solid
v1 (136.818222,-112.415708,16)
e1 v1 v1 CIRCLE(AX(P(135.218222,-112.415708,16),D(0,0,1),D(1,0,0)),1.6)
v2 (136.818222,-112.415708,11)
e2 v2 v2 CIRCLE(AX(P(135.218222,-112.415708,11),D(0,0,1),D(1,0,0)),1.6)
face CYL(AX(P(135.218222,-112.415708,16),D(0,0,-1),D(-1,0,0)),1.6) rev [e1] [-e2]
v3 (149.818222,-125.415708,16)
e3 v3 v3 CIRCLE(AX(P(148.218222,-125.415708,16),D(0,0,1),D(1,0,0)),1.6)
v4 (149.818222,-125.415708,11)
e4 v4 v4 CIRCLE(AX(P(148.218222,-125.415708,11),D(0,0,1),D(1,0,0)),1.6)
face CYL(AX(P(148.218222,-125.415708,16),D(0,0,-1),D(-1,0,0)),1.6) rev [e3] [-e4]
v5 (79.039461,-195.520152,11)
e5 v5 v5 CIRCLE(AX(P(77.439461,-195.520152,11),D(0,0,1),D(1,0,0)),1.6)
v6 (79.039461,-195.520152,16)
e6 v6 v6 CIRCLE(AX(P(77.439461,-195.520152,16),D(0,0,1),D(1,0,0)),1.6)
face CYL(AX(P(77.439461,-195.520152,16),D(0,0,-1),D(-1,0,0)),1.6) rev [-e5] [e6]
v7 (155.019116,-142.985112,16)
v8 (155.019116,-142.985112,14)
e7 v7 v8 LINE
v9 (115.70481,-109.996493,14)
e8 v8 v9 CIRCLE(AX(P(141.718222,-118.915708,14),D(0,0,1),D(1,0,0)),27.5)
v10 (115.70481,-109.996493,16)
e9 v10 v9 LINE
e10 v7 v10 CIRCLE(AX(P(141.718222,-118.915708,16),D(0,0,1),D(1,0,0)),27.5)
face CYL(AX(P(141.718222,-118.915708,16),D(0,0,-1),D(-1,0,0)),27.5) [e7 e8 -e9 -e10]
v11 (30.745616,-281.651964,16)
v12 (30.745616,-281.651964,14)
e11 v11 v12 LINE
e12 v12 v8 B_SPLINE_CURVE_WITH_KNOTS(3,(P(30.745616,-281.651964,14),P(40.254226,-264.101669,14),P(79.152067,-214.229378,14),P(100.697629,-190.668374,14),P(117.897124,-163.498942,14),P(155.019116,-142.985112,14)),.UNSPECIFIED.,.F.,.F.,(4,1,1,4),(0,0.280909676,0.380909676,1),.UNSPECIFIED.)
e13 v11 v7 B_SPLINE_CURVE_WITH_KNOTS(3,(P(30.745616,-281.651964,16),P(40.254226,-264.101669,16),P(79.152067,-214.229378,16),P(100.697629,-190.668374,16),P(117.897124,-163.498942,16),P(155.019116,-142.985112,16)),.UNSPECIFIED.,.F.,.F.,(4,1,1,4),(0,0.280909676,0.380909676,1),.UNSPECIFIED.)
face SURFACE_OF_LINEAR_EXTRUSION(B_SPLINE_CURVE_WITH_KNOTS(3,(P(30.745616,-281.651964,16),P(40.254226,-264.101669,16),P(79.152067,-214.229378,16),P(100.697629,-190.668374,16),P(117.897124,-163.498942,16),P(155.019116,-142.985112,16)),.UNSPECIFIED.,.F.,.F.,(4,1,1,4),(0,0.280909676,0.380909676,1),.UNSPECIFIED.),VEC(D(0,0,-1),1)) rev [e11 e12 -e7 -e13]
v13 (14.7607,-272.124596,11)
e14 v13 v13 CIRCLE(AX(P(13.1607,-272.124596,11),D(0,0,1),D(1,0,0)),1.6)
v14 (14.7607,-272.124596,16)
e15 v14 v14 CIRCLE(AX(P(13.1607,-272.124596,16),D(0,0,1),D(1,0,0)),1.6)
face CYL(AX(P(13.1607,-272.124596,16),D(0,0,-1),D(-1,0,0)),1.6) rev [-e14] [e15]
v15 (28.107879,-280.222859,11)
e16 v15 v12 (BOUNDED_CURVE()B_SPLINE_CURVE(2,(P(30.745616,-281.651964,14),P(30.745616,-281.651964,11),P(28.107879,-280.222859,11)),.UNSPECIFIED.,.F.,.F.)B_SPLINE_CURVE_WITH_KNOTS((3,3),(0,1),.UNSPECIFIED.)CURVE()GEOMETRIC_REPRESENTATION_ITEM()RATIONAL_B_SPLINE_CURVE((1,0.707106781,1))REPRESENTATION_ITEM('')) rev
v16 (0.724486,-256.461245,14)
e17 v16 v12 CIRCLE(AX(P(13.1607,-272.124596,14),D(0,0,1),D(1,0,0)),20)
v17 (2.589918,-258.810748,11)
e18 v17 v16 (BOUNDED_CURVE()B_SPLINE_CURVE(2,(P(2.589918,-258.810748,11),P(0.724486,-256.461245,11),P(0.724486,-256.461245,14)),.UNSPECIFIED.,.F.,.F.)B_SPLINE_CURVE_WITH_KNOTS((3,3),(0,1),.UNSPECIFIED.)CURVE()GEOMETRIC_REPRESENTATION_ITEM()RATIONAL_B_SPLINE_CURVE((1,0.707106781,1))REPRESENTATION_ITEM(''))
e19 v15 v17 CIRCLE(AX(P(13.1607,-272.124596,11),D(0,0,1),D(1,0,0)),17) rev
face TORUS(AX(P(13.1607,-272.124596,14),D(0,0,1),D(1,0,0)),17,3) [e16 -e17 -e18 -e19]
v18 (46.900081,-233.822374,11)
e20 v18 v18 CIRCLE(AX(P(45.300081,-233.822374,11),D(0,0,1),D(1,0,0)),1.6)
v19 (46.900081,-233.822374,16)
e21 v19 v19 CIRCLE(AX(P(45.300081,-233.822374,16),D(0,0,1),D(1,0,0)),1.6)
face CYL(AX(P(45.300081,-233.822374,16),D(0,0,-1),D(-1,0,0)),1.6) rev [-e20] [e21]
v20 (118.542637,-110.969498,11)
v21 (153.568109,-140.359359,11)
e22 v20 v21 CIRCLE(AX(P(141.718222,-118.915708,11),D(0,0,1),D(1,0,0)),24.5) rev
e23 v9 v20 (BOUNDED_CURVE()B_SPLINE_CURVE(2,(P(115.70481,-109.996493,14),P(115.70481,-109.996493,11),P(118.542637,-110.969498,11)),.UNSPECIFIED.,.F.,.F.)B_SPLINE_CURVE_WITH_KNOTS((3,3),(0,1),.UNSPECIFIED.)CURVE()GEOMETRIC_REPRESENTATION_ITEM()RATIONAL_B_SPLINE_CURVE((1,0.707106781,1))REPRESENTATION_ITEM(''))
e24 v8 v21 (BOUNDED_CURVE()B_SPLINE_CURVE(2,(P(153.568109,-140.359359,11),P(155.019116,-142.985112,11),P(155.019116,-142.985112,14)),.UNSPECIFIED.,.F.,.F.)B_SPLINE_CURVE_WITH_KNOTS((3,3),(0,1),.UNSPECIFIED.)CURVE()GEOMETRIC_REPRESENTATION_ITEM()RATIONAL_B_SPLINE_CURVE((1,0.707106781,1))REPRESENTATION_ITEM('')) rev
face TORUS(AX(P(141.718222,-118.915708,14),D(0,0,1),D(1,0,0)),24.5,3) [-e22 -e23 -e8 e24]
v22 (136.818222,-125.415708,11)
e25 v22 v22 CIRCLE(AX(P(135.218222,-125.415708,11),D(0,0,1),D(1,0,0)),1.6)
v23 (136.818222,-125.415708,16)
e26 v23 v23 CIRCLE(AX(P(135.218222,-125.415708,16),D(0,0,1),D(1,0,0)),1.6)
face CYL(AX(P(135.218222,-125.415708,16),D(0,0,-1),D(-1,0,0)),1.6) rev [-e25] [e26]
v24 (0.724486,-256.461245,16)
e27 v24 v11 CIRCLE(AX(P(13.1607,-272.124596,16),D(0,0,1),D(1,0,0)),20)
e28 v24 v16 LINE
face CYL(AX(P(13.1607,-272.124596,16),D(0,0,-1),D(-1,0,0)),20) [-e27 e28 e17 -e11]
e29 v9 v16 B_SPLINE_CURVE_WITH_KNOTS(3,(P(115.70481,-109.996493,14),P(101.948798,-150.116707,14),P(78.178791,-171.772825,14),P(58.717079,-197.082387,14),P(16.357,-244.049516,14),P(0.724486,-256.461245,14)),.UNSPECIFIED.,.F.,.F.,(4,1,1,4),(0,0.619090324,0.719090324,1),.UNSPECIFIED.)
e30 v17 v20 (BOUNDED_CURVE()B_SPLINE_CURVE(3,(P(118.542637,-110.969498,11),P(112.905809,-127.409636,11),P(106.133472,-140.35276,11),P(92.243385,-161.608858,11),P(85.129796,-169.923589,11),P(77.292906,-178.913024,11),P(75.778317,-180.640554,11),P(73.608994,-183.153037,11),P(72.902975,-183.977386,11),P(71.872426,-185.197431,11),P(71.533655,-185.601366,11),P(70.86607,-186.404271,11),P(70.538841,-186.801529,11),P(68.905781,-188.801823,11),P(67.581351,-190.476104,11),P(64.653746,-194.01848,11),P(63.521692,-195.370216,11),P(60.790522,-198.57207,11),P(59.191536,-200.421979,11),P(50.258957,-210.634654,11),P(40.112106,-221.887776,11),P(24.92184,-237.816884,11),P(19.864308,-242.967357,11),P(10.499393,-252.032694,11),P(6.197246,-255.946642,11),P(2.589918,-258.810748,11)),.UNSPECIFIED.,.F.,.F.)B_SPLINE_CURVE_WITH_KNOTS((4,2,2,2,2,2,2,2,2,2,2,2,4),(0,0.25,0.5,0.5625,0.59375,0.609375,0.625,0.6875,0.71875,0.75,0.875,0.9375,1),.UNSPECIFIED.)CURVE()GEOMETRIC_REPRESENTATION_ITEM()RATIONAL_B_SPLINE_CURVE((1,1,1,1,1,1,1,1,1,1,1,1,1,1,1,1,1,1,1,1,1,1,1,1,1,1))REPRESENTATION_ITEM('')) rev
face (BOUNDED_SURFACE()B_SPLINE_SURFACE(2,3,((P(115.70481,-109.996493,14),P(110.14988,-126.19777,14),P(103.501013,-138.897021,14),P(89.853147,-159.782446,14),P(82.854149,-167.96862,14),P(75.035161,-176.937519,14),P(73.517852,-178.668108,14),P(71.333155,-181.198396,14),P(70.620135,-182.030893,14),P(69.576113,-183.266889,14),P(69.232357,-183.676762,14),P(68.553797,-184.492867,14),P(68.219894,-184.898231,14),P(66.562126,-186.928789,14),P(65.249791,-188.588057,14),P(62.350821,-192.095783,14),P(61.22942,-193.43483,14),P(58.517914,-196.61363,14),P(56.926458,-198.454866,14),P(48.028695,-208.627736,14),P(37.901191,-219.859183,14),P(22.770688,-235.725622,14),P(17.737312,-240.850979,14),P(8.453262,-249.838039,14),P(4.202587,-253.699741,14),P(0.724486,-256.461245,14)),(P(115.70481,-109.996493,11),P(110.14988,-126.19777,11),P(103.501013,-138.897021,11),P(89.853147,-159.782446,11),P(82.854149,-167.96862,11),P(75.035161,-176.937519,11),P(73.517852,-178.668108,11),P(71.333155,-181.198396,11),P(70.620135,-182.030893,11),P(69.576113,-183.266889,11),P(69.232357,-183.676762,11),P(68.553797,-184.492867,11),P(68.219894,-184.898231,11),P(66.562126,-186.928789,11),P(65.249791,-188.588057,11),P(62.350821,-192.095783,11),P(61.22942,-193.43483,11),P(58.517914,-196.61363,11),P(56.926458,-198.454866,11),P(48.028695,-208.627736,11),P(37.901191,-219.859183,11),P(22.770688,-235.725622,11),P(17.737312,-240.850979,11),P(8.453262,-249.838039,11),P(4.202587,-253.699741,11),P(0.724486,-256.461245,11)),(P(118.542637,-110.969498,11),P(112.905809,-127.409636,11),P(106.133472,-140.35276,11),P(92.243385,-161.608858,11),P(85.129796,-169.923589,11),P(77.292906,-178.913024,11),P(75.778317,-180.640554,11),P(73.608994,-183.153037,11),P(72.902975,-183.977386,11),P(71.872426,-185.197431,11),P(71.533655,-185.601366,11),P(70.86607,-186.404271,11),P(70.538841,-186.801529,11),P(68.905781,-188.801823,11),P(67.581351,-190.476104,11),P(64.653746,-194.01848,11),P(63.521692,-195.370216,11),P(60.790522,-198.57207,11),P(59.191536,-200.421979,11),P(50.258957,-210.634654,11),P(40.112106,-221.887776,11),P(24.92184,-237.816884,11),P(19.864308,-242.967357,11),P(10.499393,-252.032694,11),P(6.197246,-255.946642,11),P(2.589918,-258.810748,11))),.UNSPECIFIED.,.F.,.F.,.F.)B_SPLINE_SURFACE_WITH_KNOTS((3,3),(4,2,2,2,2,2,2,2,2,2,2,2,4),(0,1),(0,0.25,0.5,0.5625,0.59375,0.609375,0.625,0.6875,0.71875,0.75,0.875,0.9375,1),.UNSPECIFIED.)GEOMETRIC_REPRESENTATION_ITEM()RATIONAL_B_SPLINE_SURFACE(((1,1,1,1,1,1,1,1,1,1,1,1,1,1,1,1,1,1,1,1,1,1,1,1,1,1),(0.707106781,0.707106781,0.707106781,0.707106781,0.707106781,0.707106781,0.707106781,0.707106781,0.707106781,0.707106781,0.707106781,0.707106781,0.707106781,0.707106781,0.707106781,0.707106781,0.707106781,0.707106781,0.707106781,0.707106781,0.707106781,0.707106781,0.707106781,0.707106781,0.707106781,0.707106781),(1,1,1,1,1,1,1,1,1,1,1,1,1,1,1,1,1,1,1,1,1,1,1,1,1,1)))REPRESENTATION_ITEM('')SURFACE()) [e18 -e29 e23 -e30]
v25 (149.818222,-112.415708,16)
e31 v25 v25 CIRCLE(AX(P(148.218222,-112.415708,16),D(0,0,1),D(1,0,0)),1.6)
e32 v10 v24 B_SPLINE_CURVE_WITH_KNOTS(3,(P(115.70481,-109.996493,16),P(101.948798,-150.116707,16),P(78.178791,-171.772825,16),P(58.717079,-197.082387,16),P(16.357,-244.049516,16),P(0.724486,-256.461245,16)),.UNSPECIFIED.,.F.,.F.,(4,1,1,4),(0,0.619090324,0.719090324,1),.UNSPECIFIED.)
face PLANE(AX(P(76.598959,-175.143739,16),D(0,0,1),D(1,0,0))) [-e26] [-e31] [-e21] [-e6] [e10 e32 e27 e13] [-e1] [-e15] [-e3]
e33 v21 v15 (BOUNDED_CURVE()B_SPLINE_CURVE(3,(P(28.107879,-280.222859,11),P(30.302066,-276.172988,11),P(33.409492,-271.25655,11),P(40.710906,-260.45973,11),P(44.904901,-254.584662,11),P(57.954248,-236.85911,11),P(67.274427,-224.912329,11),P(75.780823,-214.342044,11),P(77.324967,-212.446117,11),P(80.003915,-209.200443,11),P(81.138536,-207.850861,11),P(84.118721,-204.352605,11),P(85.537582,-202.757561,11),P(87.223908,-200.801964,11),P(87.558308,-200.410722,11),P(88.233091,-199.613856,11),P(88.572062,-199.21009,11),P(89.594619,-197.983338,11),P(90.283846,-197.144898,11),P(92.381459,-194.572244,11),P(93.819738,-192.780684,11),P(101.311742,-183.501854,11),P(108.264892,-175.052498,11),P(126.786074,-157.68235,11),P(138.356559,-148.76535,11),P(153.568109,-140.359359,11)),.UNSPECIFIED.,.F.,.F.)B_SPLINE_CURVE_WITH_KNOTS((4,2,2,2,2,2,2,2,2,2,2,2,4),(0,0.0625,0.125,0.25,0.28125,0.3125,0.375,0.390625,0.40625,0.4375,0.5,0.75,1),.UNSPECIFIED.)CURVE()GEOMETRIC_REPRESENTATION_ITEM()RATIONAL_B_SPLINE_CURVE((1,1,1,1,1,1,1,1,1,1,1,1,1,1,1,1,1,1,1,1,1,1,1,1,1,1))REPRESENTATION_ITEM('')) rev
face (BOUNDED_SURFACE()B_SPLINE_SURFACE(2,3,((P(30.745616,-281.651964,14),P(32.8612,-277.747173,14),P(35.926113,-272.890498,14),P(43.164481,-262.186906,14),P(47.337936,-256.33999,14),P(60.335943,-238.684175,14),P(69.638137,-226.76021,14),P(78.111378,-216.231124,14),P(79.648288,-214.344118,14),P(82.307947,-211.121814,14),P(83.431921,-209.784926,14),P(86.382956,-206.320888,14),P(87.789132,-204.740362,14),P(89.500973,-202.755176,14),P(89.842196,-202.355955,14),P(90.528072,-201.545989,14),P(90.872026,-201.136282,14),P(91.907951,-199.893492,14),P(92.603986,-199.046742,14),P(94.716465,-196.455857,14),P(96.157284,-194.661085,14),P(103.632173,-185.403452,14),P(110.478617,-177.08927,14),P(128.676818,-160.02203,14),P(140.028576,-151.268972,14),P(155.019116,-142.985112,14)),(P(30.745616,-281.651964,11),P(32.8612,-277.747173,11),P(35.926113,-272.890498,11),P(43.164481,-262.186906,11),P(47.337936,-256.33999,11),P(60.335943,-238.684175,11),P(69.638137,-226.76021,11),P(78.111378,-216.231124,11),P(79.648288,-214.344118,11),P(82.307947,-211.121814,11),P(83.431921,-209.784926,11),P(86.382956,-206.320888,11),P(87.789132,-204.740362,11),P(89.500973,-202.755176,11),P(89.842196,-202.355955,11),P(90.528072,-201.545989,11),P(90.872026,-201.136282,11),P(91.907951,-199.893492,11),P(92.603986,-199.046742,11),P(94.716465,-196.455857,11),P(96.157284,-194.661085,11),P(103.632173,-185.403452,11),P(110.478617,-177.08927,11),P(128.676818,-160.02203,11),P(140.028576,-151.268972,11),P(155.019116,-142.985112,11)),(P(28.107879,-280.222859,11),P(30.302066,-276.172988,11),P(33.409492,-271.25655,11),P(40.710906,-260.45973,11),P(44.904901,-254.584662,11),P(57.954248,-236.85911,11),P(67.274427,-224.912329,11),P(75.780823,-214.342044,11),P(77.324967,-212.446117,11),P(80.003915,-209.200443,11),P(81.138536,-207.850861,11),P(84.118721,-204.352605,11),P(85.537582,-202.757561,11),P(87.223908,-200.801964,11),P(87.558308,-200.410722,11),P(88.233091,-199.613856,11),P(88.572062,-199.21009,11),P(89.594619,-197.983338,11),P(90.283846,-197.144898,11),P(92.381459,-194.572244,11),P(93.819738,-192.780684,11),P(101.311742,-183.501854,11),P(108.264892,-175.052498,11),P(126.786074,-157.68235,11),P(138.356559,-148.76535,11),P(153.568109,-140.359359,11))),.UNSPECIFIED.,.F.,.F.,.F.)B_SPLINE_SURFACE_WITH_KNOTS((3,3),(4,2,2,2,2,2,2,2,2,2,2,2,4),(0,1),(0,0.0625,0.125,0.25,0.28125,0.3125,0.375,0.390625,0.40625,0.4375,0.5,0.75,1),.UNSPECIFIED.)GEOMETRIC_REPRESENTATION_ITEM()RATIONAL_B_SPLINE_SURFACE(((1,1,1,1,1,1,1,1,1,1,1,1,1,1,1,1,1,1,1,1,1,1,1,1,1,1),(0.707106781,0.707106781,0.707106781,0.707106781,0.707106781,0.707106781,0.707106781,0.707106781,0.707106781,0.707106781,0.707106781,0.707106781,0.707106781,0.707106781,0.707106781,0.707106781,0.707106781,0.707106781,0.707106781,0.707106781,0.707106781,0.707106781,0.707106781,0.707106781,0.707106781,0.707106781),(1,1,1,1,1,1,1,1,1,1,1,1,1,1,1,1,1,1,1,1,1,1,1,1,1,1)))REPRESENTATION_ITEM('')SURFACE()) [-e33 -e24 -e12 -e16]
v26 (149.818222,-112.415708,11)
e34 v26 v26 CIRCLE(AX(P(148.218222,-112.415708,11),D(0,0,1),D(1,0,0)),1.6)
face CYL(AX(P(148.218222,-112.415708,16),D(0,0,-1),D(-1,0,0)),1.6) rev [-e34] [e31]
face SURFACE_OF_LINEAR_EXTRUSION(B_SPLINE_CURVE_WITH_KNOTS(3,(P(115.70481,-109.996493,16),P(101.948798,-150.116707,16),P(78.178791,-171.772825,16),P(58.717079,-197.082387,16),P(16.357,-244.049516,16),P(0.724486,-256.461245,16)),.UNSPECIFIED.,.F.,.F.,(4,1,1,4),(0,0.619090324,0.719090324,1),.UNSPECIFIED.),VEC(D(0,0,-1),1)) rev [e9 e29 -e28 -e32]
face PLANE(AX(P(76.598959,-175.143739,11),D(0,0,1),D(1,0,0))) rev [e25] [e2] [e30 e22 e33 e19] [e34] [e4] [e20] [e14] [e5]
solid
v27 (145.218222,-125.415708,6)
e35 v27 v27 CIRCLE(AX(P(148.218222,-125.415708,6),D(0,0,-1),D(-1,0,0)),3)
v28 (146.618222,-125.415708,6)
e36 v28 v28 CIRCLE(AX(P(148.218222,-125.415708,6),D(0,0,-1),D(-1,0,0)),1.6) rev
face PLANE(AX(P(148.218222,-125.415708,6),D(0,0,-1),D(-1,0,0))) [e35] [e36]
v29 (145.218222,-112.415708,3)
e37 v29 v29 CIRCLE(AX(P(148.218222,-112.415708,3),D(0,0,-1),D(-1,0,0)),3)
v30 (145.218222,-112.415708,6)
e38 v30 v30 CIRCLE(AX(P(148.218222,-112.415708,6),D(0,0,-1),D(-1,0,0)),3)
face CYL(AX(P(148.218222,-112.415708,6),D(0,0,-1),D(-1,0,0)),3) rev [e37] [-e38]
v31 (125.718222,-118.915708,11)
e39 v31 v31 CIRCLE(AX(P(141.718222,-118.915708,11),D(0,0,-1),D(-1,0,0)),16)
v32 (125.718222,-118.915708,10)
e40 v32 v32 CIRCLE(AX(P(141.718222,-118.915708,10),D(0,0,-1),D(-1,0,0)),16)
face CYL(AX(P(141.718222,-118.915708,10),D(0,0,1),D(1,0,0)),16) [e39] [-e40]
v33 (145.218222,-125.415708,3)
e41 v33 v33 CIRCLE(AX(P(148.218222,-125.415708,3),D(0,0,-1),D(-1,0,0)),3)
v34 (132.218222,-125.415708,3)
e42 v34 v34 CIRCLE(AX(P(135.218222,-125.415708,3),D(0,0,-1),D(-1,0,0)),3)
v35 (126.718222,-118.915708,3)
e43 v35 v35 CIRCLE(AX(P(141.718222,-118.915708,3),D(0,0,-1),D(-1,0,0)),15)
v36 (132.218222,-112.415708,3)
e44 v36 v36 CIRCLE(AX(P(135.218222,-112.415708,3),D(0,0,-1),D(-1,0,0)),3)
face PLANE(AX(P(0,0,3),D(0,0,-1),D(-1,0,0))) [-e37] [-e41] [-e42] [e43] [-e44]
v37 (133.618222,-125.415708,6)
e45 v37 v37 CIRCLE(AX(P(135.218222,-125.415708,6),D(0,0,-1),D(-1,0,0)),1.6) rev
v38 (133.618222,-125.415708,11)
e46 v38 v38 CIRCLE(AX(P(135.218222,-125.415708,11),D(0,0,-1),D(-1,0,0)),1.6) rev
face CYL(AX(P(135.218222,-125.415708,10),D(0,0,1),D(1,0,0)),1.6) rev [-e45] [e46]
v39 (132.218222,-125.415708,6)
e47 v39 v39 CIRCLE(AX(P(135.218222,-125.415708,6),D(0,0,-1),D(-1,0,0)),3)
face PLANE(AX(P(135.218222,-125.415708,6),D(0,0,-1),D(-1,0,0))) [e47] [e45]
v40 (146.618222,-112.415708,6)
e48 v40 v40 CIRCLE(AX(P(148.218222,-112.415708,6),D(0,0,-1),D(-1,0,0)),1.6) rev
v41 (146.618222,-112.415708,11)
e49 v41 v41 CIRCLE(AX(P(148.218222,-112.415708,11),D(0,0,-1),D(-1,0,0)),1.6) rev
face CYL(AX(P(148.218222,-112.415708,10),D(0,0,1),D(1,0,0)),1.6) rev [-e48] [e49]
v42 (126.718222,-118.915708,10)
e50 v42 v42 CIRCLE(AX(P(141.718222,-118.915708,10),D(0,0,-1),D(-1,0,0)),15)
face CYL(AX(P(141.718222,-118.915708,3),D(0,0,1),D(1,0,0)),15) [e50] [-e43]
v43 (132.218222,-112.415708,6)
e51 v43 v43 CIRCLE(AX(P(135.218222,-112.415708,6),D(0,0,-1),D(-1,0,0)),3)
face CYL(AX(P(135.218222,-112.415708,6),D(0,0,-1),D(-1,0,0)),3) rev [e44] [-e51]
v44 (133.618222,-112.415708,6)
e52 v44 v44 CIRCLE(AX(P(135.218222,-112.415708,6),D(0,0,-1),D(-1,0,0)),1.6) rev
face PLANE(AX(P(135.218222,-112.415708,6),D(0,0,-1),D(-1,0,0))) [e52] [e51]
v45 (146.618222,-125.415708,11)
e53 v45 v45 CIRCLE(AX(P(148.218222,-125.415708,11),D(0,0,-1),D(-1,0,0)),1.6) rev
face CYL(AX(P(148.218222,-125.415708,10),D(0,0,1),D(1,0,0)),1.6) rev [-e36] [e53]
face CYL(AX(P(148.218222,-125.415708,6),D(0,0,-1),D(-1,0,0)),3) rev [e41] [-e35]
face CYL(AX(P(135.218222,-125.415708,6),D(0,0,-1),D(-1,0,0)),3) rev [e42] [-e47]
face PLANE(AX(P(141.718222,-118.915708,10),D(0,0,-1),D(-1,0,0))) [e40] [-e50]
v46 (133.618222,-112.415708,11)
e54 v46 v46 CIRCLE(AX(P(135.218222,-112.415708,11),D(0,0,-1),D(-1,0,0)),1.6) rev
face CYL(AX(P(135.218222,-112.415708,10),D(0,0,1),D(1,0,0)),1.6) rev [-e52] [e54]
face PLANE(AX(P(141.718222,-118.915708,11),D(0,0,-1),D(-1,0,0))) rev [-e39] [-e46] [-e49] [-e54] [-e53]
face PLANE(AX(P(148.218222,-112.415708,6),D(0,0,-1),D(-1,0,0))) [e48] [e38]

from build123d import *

# Parameters (mm, degrees)
SKETCH1_R           = 1.6
BOSS_EXTRUDE1_DEPTH = 5
SKETCH2_R           = 16
SKETCH2_R_2         = 1.6
BOSS_EXTRUDE2_DEPTH = 1
BOSS_EXTRUDE3_START = 7
SKETCH3_R           = 15
SKETCH3_R_2         = 1.6
BOSS_EXTRUDE3_DEPTH = 7
SKETCH4_R           = 3
CUT_EXTRUDE1_DEPTH  = 3
VARFILLET2_R        = 3


with BuildPart() as part:
    # Sketch1 → Boss-Extrude1 (new body)
    with BuildSketch(Plane.XY.offset(11)):
        with BuildLine():
            ThreePointArc((155.019115612, -142.985112199), (159.394881243, -97.849485606), (115.704809966, -109.996492831))
            add(Edge.make_bspline(
                [(115.704809966, -109.996492831), (101.94879758, -150.116707379), (78.178790791, -171.772825461), (58.717079478, -197.082387325), (16.356999542, -244.049515564), (0.72448619, -256.46124476)],
                knots=[0, 0, 0, 0, 0.619090324, 0.719090324, 1, 1, 1, 1], degree=3))
            ThreePointArc((0.72448619, -256.46124476), (0.304947846, -287.445485278), (30.74561606, -281.651963762))
            add(Edge.make_bspline(
                [(155.019115612, -142.985112199), (117.897123756, -163.498941991), (100.69762913, -190.668374405), (79.152067085, -214.229377889), (40.254225745, -264.101669257), (30.74561606, -281.651963762)],
                knots=[0, 0, 0, 0, 0.619090324, 0.719090324, 1, 1, 1, 1], degree=3))
        make_face()
        with Locations((135.218221977, -112.415707792)):
            Circle(SKETCH1_R, mode=Mode.SUBTRACT)
        with Locations((148.218221977, -112.415707792)):
            Circle(SKETCH1_R, mode=Mode.SUBTRACT)
        with Locations((148.218221977, -125.415707792)):
            Circle(SKETCH1_R, mode=Mode.SUBTRACT)
        with Locations((135.218221977, -125.415707792)):
            Circle(SKETCH1_R, mode=Mode.SUBTRACT)
        with Locations((77.439461008, -195.520152104)):
            Circle(SKETCH1_R, mode=Mode.SUBTRACT)
        with Locations((45.300080524, -233.82237426)):
            Circle(SKETCH1_R, mode=Mode.SUBTRACT)
        with Locations((13.16070004, -272.124596416)):
            Circle(SKETCH1_R, mode=Mode.SUBTRACT)
    extrude(amount=BOSS_EXTRUDE1_DEPTH)

    # VarFillet2
    varfillet2_edges = [part.edges().sort_by_distance(p)[0] for p in [
        (65.360846316, -188.427744165, 11),
        (86.521548764, -206.183681785, 11),
    ]]
    fillet(varfillet2_edges, radius=VARFILLET2_R)


with BuildPart() as body_2:
    # Sketch2 → Boss-Extrude2 (new body)
    with BuildSketch(Plane(origin=(0, 0, 11), x_dir=(-1, 0, 0), z_dir=(0, 0, -1))):
        with Locations((-141.718221977, -118.915707792)):
            Circle(SKETCH2_R)
        with Locations((-148.218221977, -125.415707792)):
            Circle(SKETCH2_R_2, mode=Mode.SUBTRACT)
        with Locations((-135.218221977, -125.415707792)):
            Circle(SKETCH2_R_2, mode=Mode.SUBTRACT)
        with Locations((-148.218221977, -112.415707792)):
            Circle(SKETCH2_R_2, mode=Mode.SUBTRACT)
        with Locations((-135.218221977, -112.415707792)):
            Circle(SKETCH2_R_2, mode=Mode.SUBTRACT)
    extrude(amount=BOSS_EXTRUDE2_DEPTH)

    # Sketch3 → Boss-Extrude3 (add)
    with BuildSketch(Plane(origin=(0, 0, 10), x_dir=(-1, 0, 0), z_dir=(0, 0, -1)).offset(BOSS_EXTRUDE3_START)):
        with Locations((-141.718221977, -118.915707792)):
            Circle(SKETCH3_R)
        with Locations((-148.218221977, -125.415707792)):
            Circle(SKETCH3_R_2, mode=Mode.SUBTRACT)
        with Locations((-135.218221977, -125.415707792)):
            Circle(SKETCH3_R_2, mode=Mode.SUBTRACT)
        with Locations((-148.218221977, -112.415707792)):
            Circle(SKETCH3_R_2, mode=Mode.SUBTRACT)
        with Locations((-135.218221977, -112.415707792)):
            Circle(SKETCH3_R_2, mode=Mode.SUBTRACT)
    extrude(amount=-BOSS_EXTRUDE3_DEPTH)

    # Sketch4 → Cut-Extrude1 (cut)
    with BuildSketch(Plane(origin=(0, 0, 3), x_dir=(-1, 0, 0), z_dir=(0, 0, -1))):
        with Locations((-148.218221977, -112.415707792)):
            Circle(SKETCH4_R)
        with Locations((-135.218221977, -112.415707792)):
            Circle(SKETCH4_R)
        with Locations((-135.218221977, -125.415707792)):
            Circle(SKETCH4_R)
        with Locations((-148.218221977, -125.415707792)):
            Circle(SKETCH4_R)
    extrude(amount=-CUT_EXTRUDE1_DEPTH, mode=Mode.SUBTRACT)


solid = Compound([part.part, body_2.part])
